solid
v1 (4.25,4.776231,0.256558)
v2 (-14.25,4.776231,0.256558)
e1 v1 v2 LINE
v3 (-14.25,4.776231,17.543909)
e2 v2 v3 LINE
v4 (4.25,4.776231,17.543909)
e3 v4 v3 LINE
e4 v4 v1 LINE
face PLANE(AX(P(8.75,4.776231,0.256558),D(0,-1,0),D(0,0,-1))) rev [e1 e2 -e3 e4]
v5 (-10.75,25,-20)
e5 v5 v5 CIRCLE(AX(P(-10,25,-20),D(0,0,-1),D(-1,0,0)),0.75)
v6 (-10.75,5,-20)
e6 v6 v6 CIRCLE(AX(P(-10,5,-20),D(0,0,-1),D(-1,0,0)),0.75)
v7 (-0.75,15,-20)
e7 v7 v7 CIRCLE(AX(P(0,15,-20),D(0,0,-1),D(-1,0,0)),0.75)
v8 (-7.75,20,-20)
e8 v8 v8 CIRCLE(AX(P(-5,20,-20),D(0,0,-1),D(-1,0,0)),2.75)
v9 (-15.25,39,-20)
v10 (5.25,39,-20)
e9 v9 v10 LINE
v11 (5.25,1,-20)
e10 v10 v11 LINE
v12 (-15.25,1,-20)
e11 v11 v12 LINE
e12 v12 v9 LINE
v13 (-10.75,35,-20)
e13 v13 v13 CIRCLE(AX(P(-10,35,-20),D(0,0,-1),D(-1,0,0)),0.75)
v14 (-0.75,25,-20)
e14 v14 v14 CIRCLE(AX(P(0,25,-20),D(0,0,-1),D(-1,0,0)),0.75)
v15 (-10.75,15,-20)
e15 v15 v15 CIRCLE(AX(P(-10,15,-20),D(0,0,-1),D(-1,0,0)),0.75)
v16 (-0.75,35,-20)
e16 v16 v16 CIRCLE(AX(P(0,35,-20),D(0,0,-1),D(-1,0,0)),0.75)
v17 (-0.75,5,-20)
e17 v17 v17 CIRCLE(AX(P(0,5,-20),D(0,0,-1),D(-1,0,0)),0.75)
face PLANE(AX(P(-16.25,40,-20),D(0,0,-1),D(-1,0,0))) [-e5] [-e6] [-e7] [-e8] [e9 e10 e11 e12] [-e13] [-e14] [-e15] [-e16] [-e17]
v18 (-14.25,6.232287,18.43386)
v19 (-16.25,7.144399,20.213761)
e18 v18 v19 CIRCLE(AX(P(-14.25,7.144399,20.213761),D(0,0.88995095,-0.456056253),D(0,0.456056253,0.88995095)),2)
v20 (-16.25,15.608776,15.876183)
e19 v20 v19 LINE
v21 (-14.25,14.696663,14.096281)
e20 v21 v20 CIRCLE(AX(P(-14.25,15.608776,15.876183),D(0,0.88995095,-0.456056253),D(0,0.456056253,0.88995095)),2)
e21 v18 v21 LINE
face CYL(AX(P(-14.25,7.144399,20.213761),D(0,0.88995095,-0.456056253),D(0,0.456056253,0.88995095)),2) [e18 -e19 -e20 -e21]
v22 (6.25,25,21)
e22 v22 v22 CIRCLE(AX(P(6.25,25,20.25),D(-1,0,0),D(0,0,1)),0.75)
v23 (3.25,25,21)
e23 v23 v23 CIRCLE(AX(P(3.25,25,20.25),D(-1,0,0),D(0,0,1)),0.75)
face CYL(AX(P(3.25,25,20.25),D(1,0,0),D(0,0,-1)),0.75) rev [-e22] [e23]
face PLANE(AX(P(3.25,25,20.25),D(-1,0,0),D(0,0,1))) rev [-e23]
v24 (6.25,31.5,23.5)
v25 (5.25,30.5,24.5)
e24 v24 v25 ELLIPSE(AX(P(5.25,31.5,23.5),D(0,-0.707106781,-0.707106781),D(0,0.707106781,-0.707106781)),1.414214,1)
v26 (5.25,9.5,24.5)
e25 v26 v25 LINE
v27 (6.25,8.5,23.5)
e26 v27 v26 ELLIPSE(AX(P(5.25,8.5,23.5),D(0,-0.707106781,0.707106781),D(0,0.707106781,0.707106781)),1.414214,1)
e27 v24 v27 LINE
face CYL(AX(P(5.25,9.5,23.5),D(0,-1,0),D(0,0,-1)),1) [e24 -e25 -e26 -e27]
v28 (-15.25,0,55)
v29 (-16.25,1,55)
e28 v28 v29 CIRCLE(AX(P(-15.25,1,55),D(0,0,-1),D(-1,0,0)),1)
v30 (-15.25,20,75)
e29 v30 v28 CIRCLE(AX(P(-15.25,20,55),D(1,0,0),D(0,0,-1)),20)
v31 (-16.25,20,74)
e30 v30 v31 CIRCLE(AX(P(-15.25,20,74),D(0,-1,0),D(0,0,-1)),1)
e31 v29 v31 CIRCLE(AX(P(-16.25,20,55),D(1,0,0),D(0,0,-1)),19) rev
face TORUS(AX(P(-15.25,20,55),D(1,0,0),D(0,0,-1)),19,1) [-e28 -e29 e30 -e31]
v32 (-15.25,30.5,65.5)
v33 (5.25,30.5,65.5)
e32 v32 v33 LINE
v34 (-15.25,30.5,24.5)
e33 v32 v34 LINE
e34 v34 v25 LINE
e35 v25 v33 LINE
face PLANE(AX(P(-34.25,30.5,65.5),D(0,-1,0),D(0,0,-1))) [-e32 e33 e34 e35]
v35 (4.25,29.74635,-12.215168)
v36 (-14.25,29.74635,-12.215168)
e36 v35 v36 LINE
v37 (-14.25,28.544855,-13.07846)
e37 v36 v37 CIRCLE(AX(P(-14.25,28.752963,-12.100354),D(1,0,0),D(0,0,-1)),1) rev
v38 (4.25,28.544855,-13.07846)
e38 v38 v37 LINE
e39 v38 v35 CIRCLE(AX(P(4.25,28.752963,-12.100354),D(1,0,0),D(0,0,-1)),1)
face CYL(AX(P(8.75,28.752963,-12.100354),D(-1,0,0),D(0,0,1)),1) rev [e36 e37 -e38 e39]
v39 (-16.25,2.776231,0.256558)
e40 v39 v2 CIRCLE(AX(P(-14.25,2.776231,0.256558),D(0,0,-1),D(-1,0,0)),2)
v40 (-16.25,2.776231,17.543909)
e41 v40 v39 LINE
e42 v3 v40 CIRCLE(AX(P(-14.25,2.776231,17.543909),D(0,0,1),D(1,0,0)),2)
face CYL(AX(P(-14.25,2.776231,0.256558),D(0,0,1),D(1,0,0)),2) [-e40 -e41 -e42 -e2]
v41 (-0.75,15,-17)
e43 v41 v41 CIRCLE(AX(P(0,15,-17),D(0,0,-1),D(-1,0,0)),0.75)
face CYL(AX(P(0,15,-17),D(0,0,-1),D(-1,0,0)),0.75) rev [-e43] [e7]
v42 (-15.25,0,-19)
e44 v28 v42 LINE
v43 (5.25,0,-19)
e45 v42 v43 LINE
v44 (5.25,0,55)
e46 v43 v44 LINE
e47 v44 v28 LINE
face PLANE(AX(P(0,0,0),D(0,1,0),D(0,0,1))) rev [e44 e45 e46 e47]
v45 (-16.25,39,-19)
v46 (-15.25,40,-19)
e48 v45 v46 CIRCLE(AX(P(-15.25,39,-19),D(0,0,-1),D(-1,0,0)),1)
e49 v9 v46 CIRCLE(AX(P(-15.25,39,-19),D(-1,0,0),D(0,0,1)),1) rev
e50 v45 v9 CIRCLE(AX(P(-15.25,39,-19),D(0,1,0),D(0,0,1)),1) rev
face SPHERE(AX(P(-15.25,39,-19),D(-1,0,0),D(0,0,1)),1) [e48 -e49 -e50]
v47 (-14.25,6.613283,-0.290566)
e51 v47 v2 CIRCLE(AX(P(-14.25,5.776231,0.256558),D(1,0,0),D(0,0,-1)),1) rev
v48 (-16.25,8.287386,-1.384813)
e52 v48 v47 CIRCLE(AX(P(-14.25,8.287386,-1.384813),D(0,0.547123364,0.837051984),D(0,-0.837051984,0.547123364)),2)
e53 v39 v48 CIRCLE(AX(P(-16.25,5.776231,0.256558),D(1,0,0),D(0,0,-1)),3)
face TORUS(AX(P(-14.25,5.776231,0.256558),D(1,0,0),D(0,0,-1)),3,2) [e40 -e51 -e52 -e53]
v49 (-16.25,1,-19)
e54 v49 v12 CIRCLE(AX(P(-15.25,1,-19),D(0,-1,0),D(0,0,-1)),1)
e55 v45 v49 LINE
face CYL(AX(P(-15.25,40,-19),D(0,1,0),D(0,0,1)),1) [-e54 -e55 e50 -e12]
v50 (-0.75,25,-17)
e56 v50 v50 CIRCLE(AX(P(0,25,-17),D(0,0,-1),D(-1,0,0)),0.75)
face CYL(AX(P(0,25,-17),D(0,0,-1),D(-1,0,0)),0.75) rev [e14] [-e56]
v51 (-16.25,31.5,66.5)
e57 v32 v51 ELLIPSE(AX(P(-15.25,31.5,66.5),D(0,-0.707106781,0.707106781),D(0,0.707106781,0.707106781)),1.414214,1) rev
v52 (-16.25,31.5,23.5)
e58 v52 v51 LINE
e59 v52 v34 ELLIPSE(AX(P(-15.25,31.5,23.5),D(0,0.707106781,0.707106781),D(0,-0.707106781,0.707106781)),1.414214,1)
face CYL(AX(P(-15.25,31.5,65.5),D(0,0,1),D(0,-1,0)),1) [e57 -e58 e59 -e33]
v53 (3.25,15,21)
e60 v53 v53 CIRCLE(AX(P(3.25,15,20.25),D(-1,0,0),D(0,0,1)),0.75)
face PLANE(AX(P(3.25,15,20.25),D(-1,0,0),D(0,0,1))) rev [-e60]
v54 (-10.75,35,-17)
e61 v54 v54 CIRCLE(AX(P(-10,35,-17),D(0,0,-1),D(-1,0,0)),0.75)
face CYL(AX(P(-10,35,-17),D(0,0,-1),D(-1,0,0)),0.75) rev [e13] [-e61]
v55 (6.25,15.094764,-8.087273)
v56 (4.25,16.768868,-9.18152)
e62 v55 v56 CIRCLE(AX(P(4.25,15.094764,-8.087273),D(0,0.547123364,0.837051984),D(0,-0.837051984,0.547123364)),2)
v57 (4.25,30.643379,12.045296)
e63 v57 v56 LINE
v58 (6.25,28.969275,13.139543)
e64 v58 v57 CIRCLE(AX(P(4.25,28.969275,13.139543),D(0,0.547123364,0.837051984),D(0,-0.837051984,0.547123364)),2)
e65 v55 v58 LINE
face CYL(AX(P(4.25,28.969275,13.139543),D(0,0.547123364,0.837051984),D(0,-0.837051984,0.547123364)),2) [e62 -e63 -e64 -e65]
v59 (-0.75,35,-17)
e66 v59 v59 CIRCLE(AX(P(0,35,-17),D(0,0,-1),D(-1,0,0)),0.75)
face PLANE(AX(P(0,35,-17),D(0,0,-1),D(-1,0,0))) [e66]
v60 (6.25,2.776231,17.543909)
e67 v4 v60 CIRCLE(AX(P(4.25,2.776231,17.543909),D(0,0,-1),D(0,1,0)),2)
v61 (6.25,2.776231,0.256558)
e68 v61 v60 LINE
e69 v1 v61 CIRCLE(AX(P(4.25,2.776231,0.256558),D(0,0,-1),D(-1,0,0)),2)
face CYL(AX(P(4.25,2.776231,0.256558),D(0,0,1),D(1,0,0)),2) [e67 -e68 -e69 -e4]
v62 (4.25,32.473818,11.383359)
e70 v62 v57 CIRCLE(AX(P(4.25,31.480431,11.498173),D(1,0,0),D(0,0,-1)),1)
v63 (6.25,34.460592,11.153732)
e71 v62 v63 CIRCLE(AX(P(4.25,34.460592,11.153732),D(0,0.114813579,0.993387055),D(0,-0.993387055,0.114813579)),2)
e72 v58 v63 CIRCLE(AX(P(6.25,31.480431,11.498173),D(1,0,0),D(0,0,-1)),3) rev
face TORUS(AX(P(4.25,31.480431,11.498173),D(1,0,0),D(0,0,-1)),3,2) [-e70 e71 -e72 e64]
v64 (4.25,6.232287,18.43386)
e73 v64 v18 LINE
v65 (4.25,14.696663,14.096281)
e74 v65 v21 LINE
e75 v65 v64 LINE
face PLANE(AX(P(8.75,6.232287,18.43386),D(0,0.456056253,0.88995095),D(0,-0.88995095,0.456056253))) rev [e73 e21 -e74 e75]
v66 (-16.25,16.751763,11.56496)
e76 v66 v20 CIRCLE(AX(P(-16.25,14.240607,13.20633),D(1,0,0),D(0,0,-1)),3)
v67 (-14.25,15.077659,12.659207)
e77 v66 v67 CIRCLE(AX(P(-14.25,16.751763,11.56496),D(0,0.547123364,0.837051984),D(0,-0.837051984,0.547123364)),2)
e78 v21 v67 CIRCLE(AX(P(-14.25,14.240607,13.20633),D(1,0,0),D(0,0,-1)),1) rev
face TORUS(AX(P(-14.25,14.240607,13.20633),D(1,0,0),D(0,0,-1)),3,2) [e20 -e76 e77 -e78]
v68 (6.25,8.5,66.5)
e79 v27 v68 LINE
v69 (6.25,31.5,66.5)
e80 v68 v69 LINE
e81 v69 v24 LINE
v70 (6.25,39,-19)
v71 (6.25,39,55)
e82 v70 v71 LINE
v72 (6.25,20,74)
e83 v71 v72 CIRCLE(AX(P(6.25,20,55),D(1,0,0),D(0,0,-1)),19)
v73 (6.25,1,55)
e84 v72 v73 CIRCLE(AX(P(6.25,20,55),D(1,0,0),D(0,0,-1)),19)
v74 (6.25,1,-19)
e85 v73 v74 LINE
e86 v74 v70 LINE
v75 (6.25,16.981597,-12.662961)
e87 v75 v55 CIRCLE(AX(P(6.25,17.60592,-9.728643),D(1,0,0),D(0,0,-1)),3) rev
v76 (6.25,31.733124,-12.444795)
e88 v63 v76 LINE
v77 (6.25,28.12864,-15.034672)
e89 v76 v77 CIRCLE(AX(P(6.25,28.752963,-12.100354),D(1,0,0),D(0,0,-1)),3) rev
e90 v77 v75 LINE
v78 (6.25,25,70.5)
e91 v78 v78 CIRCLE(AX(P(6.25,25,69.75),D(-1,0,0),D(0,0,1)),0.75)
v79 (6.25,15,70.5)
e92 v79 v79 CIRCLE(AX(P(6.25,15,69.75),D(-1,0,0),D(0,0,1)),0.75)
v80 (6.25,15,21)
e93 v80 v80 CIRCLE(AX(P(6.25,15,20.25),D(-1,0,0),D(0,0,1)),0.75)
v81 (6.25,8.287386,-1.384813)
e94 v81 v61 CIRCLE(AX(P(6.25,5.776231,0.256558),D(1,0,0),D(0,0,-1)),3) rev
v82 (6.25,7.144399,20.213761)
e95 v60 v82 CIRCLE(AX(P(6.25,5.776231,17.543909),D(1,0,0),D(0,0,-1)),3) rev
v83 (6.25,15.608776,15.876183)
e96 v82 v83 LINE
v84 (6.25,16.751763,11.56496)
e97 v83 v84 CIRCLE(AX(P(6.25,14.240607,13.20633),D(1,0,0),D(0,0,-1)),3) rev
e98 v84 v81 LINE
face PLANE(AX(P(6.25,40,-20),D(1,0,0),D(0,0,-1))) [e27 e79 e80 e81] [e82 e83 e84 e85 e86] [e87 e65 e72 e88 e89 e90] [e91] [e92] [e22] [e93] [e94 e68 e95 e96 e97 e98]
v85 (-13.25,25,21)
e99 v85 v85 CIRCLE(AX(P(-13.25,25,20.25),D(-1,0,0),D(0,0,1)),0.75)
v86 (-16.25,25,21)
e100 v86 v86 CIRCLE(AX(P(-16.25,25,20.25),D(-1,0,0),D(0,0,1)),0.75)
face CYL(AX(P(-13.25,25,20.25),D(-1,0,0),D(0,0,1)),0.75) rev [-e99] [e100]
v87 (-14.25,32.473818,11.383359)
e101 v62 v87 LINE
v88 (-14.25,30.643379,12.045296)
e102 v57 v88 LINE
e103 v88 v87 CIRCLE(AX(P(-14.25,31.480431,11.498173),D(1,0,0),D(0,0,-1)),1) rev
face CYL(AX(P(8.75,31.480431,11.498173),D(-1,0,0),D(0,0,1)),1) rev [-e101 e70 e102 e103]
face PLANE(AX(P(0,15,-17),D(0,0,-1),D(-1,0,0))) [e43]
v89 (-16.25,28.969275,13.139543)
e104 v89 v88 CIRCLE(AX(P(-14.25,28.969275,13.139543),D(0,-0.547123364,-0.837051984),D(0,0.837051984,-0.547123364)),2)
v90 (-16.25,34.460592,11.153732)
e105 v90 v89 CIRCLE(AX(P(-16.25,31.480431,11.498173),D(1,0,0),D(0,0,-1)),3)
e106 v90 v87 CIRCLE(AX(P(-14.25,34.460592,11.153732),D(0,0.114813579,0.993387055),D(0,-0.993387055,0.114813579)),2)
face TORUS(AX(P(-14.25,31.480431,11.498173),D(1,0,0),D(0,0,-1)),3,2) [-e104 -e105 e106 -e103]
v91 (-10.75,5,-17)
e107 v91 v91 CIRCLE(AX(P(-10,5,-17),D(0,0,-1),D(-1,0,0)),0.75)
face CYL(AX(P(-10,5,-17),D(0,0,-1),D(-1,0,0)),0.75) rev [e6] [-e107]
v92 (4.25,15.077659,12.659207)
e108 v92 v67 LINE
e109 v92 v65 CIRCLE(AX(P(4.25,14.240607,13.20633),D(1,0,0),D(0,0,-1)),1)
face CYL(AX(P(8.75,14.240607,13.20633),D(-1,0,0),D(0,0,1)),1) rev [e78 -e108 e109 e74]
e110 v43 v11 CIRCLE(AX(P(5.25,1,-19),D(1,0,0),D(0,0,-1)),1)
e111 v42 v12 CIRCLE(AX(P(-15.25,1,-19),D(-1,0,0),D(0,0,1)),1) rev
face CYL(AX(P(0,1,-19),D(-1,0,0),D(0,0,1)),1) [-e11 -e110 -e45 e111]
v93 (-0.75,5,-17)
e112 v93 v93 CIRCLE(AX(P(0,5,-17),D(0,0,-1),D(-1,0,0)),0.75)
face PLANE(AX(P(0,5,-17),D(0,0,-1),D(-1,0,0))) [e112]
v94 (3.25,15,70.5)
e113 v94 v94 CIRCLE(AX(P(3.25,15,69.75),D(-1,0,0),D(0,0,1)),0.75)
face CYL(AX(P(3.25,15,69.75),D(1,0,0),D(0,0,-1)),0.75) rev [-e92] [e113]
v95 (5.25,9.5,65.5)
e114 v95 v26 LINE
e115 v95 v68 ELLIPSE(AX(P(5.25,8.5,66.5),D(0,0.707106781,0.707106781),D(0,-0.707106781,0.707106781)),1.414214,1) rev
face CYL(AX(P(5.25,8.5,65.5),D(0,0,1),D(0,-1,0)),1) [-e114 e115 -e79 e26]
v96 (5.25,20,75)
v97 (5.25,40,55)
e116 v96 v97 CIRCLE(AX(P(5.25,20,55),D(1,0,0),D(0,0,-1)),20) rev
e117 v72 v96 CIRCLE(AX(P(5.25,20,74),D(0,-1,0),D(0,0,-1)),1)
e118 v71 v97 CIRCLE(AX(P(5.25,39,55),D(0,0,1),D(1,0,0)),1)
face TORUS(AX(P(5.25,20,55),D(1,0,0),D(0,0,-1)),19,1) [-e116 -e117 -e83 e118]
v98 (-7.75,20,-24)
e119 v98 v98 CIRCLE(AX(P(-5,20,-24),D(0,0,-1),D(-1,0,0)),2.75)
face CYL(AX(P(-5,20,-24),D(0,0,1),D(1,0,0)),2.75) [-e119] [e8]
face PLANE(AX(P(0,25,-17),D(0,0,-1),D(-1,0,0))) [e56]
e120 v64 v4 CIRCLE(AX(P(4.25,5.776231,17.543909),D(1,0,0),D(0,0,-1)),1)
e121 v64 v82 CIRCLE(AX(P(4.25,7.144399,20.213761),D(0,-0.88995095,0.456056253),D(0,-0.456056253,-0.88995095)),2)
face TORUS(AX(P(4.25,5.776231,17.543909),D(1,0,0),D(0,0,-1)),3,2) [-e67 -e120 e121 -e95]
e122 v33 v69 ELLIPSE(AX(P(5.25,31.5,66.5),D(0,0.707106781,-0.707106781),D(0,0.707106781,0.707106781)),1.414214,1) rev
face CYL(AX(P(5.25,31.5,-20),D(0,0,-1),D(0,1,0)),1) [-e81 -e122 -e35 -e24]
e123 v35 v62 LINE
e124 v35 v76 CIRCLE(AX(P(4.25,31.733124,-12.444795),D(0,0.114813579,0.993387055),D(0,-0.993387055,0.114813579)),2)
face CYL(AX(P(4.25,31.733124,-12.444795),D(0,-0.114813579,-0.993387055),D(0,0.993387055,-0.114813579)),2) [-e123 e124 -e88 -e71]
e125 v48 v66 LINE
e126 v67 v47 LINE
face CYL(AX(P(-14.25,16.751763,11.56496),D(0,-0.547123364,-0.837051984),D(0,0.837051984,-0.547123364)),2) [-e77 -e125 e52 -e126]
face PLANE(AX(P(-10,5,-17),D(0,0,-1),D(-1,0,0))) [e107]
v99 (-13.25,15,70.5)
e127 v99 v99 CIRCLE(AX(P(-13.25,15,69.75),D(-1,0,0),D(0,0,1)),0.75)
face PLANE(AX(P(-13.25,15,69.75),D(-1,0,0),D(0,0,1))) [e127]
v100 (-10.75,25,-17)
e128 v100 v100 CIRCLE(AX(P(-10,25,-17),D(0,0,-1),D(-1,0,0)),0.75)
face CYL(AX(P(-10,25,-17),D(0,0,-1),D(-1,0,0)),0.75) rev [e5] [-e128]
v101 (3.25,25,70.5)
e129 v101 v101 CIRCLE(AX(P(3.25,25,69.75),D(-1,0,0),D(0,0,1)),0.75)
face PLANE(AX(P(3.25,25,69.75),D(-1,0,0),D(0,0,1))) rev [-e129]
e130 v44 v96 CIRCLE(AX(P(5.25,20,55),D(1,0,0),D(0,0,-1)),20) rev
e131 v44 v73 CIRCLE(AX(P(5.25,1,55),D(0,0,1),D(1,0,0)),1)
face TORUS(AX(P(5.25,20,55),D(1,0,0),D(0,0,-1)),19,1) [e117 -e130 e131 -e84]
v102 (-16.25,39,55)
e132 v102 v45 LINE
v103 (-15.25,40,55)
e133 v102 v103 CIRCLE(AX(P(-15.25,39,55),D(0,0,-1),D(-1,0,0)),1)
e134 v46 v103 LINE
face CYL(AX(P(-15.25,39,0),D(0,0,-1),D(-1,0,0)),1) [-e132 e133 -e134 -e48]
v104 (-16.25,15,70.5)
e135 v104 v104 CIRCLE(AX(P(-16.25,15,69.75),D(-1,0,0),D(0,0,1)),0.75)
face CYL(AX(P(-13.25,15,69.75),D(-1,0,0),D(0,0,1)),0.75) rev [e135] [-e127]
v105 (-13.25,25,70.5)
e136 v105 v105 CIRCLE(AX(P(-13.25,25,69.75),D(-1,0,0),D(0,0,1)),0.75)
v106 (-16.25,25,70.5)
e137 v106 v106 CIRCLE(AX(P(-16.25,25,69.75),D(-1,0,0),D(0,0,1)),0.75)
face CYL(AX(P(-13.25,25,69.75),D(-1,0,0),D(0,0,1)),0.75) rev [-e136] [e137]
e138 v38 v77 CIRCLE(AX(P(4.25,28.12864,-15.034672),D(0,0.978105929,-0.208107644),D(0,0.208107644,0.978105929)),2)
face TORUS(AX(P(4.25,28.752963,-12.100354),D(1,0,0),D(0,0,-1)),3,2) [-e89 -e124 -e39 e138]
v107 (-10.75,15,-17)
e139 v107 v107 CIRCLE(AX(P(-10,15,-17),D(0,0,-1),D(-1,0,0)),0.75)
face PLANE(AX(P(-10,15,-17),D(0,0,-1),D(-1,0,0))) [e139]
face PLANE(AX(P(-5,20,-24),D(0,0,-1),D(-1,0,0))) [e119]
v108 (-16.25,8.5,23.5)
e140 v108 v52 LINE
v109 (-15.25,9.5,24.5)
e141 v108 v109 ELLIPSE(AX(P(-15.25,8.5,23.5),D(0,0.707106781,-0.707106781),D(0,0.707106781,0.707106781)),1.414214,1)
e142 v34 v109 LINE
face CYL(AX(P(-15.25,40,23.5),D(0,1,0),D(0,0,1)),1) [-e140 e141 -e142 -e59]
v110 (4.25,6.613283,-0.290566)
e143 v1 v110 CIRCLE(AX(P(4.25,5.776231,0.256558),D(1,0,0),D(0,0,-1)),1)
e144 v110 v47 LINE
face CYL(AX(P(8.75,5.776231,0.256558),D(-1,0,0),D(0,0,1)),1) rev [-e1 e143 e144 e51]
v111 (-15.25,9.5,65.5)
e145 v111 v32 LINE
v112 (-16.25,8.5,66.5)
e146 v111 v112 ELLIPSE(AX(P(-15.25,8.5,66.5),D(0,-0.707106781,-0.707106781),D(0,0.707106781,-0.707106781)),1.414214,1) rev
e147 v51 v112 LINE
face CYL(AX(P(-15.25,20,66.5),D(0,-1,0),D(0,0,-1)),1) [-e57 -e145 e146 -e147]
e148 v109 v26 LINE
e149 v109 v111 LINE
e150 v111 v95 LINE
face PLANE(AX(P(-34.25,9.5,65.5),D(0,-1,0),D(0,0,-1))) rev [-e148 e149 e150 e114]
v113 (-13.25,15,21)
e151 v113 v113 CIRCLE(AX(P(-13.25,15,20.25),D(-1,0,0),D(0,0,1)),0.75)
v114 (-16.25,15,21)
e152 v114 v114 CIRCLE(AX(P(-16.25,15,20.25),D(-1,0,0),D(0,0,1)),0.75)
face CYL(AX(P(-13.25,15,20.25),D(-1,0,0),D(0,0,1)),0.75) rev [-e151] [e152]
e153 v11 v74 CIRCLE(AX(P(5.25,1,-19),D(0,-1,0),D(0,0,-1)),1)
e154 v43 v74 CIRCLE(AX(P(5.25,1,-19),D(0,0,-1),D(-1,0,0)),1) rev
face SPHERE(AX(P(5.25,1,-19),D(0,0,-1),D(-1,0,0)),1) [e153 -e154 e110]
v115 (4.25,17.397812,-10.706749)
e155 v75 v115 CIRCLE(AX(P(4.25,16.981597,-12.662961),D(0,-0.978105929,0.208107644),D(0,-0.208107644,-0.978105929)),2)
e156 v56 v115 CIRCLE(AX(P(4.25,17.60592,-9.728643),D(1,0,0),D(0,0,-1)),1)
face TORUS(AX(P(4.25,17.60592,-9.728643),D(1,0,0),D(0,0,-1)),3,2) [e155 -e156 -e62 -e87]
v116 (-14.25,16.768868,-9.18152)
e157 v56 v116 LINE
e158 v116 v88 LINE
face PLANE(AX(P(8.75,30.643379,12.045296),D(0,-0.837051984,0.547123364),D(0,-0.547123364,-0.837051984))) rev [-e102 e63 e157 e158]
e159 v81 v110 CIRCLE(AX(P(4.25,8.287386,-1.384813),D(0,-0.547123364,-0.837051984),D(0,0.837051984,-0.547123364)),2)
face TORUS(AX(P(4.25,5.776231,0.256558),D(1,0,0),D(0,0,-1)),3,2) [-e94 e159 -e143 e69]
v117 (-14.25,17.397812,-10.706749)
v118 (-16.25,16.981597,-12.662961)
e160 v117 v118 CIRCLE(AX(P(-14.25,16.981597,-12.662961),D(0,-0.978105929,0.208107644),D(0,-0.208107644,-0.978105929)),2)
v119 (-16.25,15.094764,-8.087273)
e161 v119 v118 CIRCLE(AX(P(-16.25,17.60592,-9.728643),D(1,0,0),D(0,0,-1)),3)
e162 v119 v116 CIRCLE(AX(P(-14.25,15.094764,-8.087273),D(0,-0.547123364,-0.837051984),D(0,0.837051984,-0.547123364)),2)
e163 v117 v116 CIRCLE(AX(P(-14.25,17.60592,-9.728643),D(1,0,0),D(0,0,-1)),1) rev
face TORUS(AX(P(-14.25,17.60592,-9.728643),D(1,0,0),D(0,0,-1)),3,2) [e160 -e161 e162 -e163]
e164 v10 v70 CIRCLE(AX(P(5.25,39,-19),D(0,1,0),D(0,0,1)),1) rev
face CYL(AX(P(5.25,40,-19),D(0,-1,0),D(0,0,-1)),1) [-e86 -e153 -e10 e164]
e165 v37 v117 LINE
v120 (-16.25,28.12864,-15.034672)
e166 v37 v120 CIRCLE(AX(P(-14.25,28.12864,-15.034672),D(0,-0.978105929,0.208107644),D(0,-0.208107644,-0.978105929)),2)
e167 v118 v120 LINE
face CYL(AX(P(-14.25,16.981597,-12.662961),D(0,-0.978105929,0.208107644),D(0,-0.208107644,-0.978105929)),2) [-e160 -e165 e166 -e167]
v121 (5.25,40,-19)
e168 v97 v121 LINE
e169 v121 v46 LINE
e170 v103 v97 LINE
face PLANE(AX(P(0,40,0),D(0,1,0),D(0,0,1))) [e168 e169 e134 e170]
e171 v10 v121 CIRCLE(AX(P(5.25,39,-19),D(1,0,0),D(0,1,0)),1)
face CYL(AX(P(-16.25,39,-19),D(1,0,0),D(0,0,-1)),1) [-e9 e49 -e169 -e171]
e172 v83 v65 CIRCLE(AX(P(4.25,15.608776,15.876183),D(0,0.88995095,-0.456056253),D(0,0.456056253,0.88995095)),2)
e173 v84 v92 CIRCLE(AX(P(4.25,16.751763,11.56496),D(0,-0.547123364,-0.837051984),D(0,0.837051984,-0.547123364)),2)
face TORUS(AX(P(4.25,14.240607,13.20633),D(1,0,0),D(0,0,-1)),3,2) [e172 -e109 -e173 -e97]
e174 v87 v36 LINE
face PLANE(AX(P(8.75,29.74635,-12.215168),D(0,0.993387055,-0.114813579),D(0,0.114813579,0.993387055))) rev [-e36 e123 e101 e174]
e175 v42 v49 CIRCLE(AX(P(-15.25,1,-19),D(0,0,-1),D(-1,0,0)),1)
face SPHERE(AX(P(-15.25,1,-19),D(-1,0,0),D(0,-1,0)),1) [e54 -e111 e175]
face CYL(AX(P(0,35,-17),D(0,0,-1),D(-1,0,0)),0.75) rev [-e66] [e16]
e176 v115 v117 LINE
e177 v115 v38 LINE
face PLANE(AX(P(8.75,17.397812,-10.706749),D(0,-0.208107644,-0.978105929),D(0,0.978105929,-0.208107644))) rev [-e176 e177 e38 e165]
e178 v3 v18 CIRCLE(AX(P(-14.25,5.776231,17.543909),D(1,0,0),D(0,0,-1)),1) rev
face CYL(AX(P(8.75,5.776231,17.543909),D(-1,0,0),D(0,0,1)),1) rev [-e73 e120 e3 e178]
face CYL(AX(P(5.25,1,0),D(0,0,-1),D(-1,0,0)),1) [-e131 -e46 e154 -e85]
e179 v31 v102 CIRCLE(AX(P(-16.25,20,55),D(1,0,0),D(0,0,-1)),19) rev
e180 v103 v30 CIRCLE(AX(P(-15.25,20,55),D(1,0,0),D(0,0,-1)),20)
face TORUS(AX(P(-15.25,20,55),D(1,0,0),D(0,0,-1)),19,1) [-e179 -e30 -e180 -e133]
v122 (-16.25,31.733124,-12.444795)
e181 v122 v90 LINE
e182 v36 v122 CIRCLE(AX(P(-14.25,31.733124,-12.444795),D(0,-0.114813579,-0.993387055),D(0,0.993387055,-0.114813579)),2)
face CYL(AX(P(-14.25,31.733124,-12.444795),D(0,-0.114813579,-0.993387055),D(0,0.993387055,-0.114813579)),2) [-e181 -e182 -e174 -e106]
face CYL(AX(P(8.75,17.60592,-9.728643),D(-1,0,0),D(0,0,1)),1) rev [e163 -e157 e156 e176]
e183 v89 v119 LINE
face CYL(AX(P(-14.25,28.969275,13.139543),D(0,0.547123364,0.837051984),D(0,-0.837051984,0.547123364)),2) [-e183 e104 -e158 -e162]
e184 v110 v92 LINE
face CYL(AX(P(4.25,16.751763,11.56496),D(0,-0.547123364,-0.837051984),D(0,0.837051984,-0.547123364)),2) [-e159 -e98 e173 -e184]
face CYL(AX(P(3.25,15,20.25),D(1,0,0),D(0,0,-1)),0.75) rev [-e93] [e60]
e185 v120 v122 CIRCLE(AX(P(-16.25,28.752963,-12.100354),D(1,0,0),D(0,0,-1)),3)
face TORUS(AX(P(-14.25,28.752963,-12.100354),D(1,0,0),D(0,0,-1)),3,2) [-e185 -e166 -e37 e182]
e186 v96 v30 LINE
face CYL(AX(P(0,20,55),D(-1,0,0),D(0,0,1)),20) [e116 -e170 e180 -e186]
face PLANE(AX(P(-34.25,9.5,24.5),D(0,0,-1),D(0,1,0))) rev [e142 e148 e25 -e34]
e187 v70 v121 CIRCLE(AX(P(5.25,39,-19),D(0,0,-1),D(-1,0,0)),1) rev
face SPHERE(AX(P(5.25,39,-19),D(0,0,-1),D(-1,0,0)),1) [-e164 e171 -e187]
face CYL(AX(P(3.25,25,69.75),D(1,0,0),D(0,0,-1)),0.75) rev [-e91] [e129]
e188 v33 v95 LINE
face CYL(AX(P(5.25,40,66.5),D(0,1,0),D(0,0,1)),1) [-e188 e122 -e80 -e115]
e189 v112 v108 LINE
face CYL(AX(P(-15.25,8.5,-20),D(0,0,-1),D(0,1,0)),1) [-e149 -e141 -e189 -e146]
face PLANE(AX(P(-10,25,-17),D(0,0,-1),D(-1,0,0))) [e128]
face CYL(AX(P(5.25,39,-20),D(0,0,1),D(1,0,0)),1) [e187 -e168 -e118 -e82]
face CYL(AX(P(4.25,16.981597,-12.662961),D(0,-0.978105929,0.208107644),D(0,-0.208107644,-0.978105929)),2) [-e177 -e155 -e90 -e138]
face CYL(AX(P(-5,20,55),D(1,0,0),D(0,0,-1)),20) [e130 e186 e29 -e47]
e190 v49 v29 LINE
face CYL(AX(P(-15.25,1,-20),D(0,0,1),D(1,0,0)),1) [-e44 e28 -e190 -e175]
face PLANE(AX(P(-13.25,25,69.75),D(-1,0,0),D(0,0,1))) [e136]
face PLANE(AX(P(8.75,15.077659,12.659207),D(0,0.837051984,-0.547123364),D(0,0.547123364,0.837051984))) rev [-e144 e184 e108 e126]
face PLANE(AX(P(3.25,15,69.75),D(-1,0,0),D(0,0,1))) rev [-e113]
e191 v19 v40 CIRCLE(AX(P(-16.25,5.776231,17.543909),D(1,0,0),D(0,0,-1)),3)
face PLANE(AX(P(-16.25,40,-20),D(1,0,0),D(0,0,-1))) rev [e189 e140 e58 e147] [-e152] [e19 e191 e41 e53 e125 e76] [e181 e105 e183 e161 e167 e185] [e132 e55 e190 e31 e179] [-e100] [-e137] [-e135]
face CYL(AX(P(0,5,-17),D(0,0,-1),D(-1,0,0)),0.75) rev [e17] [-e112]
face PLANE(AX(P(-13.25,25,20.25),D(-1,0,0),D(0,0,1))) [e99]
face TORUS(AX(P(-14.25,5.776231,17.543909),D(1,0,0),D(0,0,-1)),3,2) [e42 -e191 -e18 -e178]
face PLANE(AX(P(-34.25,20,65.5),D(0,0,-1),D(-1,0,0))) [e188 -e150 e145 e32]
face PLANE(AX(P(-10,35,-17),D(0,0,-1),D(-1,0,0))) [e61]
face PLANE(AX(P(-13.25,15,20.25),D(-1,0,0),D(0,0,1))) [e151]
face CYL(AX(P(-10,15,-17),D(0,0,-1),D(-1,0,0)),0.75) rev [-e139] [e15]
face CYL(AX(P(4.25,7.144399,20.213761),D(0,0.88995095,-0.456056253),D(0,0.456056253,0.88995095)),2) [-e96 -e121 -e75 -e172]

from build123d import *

# Parameters (mm, degrees)
MBODY_DEPTH           = 40
SKETCH5_R             = 0.75
FRONTSCREWS_DEPTH     = 3
SKETCH7_R             = 2.75
GUIDKNOB_DEPTH        = 4
SERVOCUT_DEPTH        = 40.5
ROUNDEND_R            = 20
SKETCH15_R            = 0.75
SERVOSCREWS_DEPTH     = 3
EDGES1MM_R            = 1
MASSREDUCTION_DEPTH   = 25
MASSREDUCTIONFILLET_R = 2
SERVOSCREWS1_START    = -3
SKETCH21_R            = 0.75
SERVOSCREWS1_DEPTH    = 3


with BuildPart() as part:
    # Sketch4 → MBODY (new body)
    with BuildSketch(Plane(origin=(0, 0, 0), x_dir=(1, 0, 0), z_dir=(0, 1, 0))):
        Polygon((-5, 20), (-16.25, 20), (-16.25, -75), (-5, -75), (6.25, -75), (6.25, 20), align=None)
    extrude(amount=MBODY_DEPTH)

    # Sketch5 → FrontScrews (cut)
    with BuildSketch(Plane(origin=(0, 0, -20), x_dir=(-1, 0, 0), z_dir=(0, 0, -1))):
        with Locations((0, 5)):
            Circle(SKETCH5_R)
        with Locations((10, 5)):
            Circle(SKETCH5_R)
        with Locations((10, 15)):
            Circle(SKETCH5_R)
        with Locations((0, 15)):
            Circle(SKETCH5_R)
        with Locations((0, 25)):
            Circle(SKETCH5_R)
        with Locations((10, 25)):
            Circle(SKETCH5_R)
        with Locations((10, 35)):
            Circle(SKETCH5_R)
        with Locations((0, 35)):
            Circle(SKETCH5_R)
    extrude(amount=-FRONTSCREWS_DEPTH, mode=Mode.SUBTRACT)

    # Sketch7 → GUIDKNOB (add)
    with BuildSketch(Plane(origin=(0, 0, -20), x_dir=(-1, 0, 0), z_dir=(0, 0, -1))):
        with Locations((5, 20)):
            Circle(SKETCH7_R)
    extrude(amount=GUIDKNOB_DEPTH)

    # Sketch10 → ServoCut (cut)
    with BuildSketch(Plane(origin=(6.25, 0, 0), x_dir=(0, 0, -1), z_dir=(1, 0, 0))):
        Polygon((-65.5, 20), (-65.5, 30.5), (-24.5, 30.5), (-24.5, 9.5), (-65.5, 9.5), align=None)
    extrude(amount=-SERVOCUT_DEPTH, mode=Mode.SUBTRACT)

    # RoundEnd
    roundend_edges = [part.edges().sort_by_distance(p)[0] for p in [
        (-5, 0, 75),
        (-5, 40, 75),
    ]]
    fillet(roundend_edges, radius=ROUNDEND_R - 0.0001)  # a hair under: the kernel refuses the full size

    # Sketch15 → ServoScrews (cut)
    with BuildSketch(Plane(origin=(6.25, 33.75, 0), x_dir=(0, 1, 0), z_dir=(-1, 0, 0))):
        with Locations(Location((-18.75, -69.75, 0), (0, 0, 270))):
            Circle(SKETCH15_R)
        with Locations(Location((-8.75, -69.75, 0), (0, 0, 270))):
            Circle(SKETCH15_R)
        with Locations(Location((-8.75, -20.25, 0), (0, 0, 270))):
            Circle(SKETCH15_R)
        with Locations(Location((-18.75, -20.25, 0), (0, 0, 270))):
            Circle(SKETCH15_R)
    extrude(amount=SERVOSCREWS_DEPTH, mode=Mode.SUBTRACT)

    # EDGES1MM
    edges1mm_edges = [part.edges().sort_by_distance(p)[0] for p in [
        (-16.25, 20, -20),
        (6.25, 20, -20),
        (6.25, 40, 17.50005),
        (-5, 40, -20),
        (-16.25, 40, 17.50005),
        (6.25, 20, 65.5),
        (6.25, 30.5, 45),
        (-16.25, 20, 24.5),
        (-16.25, 9.5, 45),
        (-16.25, 20, 65.5),
        (-16.25, 30.5, 45),
        (-5, 0, -20),
        (6.25, 9.5, 45),
        (6.25, 20, 24.5),
        (6.25, 0, 17.50005),
        (6.25, 34.142164913, 69.142164913),
        (6.25, 5.857835087, 69.142164913),
        (-16.25, 34.142164913, 69.142164913),
        (-16.25, 5.857835087, 69.142164913),
        (-16.25, 0, 17.50005),
    ]]
    fillet(edges1mm_edges, radius=EDGES1MM_R)

    # Sketch20 → MASSREDUCTION (cut)
    with BuildSketch(Plane.ZY.offset(16.25)):
        with BuildLine():
            Line((-12.215168046, 29.74634987), (11.383359391, 32.473817865))
            ThreePointArc((11.383359391, 32.473817865), (12.438571666, 31.820504762), (12.045296334, 30.643378825))
            Line((12.045296334, 30.643378825), (-9.181519802, 16.768867719))
            ThreePointArc((-9.181519802, 16.768867719), (-10.109863888, 16.681435652), (-10.706749095, 17.397812059))
            Line((-10.706749095, 17.397812059), (-13.078460395, 28.54485517))
            ThreePointArc((-13.078460395, 28.54485517), (-12.91246015, 29.33647319), (-12.215168046, 29.74634987))
        make_face()
        with BuildLine():
            Line((12.659206955, 15.077659132), (-0.290565805, 6.613282524))
            ThreePointArc((-0.290565805, 6.613282524), (-0.701840058, 5.490794018), (0.256557559, 4.776230539))
            Line((0.256557559, 4.776230539), (17.543908561, 4.776230539))
            ThreePointArc((17.543908561, 4.776230539), (18.397154203, 5.254721313), (18.433859511, 6.232286792))
            Line((18.433859511, 6.232286792), (14.09628127, 14.696663401))
            ThreePointArc((14.09628127, 14.696663401), (13.462596051, 15.207213518), (12.659206955, 15.077659132))
        make_face()
    extrude(amount=-MASSREDUCTION_DEPTH, mode=Mode.SUBTRACT)

    # MASSREDUCTIONFILLET
    massreductionfillet_edges = [part.edges().sort_by_distance(p)[0] for p in [
        (6.25, 31.110083867, -0.415904328),
        (6.25, 29.33647319, -12.91246015),
        (6.25, 22.971333615, -11.892604745),
        (6.25, 16.681435652, -10.109863888),
        (6.25, 23.706123272, 1.431888266),
        (6.25, 31.820504762, 12.438571666),
        (6.25, 10.845470828, 6.184320575),
        (6.25, 5.490794018, -0.701840058),
        (6.25, 4.776230539, 8.90023306),
        (6.25, 5.254721313, 18.397154203),
        (6.25, 10.464475096, 16.26507039),
        (6.25, 15.207213518, 13.462596051),
        (-16.25, 15.207213518, 13.462596051),
        (-16.25, 10.845470828, 6.184320575),
        (-16.25, 5.490794018, -0.701840058),
        (-16.25, 4.776230539, 8.90023306),
        (-16.25, 5.254721313, 18.397154203),
        (-16.25, 10.464475096, 16.26507039),
        (-16.25, 31.820504762, 12.438571666),
        (-16.25, 31.110083867, -0.415904328),
        (-16.25, 29.33647319, -12.91246015),
        (-16.25, 22.971333615, -11.892604745),
        (-16.25, 16.681435652, -10.109863888),
        (-16.25, 23.706123272, 1.431888266),
    ]]
    fillet(massreductionfillet_edges, radius=MASSREDUCTIONFILLET_R)

    # Sketch21 → ServoScrews1 (cut)
    with BuildSketch(Plane(origin=(-16.25, 33.75, -16.25), x_dir=(0, 1, 0), z_dir=(-1, 0, 0)).offset(SERVOSCREWS1_START)):
        with Locations(Location((-18.75, -86, 0), (0, 0, 270))):
            Circle(SKETCH21_R)
        with Locations(Location((-8.75, -86, 0), (0, 0, 270))):
            Circle(SKETCH21_R)
        with Locations(Location((-8.75, -36.5, 0), (0, 0, 270))):
            Circle(SKETCH21_R)
        with Locations(Location((-18.75, -36.5, 0), (0, 0, 270))):
            Circle(SKETCH21_R)
    extrude(amount=SERVOSCREWS1_DEPTH, mode=Mode.SUBTRACT)


solid = part.part
